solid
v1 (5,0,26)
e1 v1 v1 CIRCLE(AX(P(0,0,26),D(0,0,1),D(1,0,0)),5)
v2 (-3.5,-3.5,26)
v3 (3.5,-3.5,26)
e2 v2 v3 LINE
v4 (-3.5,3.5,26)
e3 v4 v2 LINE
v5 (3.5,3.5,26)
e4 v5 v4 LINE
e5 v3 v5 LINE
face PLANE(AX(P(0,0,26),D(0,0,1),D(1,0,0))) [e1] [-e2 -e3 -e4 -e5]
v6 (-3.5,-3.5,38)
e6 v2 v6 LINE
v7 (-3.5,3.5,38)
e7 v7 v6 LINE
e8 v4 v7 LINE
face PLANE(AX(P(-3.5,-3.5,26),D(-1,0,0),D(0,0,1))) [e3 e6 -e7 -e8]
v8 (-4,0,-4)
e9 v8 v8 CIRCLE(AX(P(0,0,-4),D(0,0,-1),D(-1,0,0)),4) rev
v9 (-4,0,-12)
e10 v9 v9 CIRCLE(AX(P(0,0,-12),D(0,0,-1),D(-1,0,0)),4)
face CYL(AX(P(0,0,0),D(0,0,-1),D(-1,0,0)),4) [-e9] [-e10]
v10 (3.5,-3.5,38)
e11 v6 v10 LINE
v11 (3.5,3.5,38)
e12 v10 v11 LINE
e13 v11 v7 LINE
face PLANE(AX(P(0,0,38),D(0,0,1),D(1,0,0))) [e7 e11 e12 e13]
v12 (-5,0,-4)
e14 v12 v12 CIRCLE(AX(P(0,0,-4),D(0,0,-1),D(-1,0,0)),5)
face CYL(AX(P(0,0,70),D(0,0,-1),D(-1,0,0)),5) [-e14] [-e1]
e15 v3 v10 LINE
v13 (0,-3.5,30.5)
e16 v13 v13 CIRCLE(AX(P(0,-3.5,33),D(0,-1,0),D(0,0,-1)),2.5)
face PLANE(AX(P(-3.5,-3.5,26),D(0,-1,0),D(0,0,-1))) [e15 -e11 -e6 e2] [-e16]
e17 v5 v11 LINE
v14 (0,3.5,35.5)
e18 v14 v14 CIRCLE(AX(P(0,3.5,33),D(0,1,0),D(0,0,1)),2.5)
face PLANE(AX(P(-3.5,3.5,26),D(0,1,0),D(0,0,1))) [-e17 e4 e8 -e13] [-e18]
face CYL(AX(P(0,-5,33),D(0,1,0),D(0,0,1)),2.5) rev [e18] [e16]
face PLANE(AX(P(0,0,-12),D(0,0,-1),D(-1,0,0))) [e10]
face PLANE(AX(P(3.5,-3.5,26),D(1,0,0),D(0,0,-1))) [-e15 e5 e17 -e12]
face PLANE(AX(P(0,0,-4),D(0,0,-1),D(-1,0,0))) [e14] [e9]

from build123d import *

# Parameters (mm, degrees)
ESQUISSE1_R                 = 5
BOSS_EXTRU_1_DEPTH          = 70
ESQUISSE2_R                 = 30
BOSS_EXTRU_2_DEPTH          = 5
ESQUISSE3_R                 = 3.5
BOSS_EXTRU_3_DEPTH          = 12
BOSS_EXTRU_4_START          = 12
ESQUISSE4_R                 = 3.5
BOSS_EXTRU_4_DEPTH          = 12
ENL_V_MAT_EXTRU_1_DEPTH     = 10
ESQUISSE6_R                 = 30
ENL_V_MAT_EXTRU_2_DEPTH     = 47
ESQUISSE7_R                 = 5
BOSS_EXTRU_5_DEPTH          = 3
ESQUISSE8_R                 = 4
BOSS_EXTRU_6_DEPTH          = 12
ENL_V_START                 = -12
ENL_V_MAT_EXTRU_3_OUTLINE_R = 5
ENL_V_MAT_EXTRU_3_OUTLINE_W = 7
ENL_V_MAT_EXTRU_3_OUTLINE_H = 7
ENL_V_MAT_EXTRU_3_DEPTH     = 12
ESQUISSE10_R                = 2.5
ENL_V_MAT_EXTRU_4_DEPTH     = 40.258756985
BOSS_EXTRU_7_START          = 4
ESQUISSE11_R                = 5
ESQUISSE11_R_2              = 4
BOSS_EXTRU_7_DEPTH          = 4


# Read off the part's stored shape, not the designer's step: Enlèv. mat.-Extru.3
with BuildPart() as part:
    # Esquisse1 → Boss.-Extru.1 (new body)
    with BuildSketch(Plane.XY):
        Circle(ESQUISSE1_R)
    extrude(amount=BOSS_EXTRU_1_DEPTH)

    # Esquisse2 → Boss.-Extru.2 (add)
    with BuildSketch(Plane.XY.offset(70)):
        Circle(ESQUISSE2_R)
    extrude(amount=-BOSS_EXTRU_2_DEPTH)

    # Esquisse3 → Boss.-Extru.3 (add)
    with BuildSketch(Plane(origin=(0, 0, 0), x_dir=(-1, 0, 0), z_dir=(0, 0, -1))):
        Circle(ESQUISSE3_R)
    extrude(amount=BOSS_EXTRU_3_DEPTH)

    # Esquisse4 → Boss.-Extru.4 (add)
    with BuildSketch(Plane.XY.offset(70).offset(BOSS_EXTRU_4_START)):
        with Locations(Location((0, 0, 0), (0, 0, 180))):
            Circle(ESQUISSE4_R)
    extrude(amount=-BOSS_EXTRU_4_DEPTH)

    # Esquisse5 → Enlèv. mat.-Extru.1 (cut)
    with BuildSketch(Plane.XY.offset(70)):
        with BuildLine():
            ThreePointArc((3.911624902, 29.743893333), (1.96, 29.935904864), (0, 30))
            Line((0, 30), (1.54, 24.952522919))
            ThreePointArc((1.54, 24.952522919), (1.639797772, 24.946163298), (1.739569306, 24.939404536))
            Line((1.739569306, 24.939404536), (3.911624902, 29.743893333))
        make_face()
        with BuildLine():
            Line((-1.54, 24.952522919), (0, 30))
            ThreePointArc((0, 30), (-1.96, 29.935904864), (-3.911624902, 29.743893333))
            Line((-3.911624902, 29.743893333), (-1.739569306, 24.939404536))
            ThreePointArc((-1.739569306, 24.939404536), (-1.639797772, 24.946163298), (-1.54, 24.952522919))
        make_face()
        with BuildLine():
            ThreePointArc((7.75646359, 28.979946042), (5.846535396, 29.424785876), (3.911624902, 29.743893333))
            Line((3.911624902, 29.743893333), (4.793067146, 24.536228466))
            ThreePointArc((4.793067146, 24.536228466), (4.878466786, 24.519391547), (4.963807286, 24.50225739))
            Line((4.963807286, 24.50225739), (7.75646359, 28.979946042))
        make_face()
        with BuildLine():
            Line((-4.793067146, 24.536228466), (-3.911624902, 29.743893333))
            ThreePointArc((-3.911624902, 29.743893333), (-5.846535396, 29.424785876), (-7.75646359, 28.979946042))
            Line((-7.75646359, 28.979946042), (-4.963807286, 24.50225739))
            ThreePointArc((-4.963807286, 24.50225739), (-4.878466786, 24.519391547), (-4.793067146, 24.536228466))
        make_face()
        with BuildLine():
            ThreePointArc((11.468870142, 27.721201591), (9.633248345, 28.411274634), (7.75646359, 28.979946042))
            Line((7.75646359, 28.979946042), (7.939081747, 23.705927128))
            ThreePointArc((7.939081747, 23.705927128), (8.021571427, 23.678141647), (8.103963866, 23.650069126))
            Line((8.103963866, 23.650069126), (11.468870142, 27.721201591))
        make_face()
        with BuildLine():
            Line((-7.939081747, 23.705927128), (-7.75646359, 28.979946042))
            ThreePointArc((-7.75646359, 28.979946042), (-9.633248345, 28.411274634), (-11.468870142, 27.721201591))
            Line((-11.468870142, 27.721201591), (-8.103963866, 23.650069126))
            ThreePointArc((-8.103963866, 23.650069126), (-8.021571427, 23.678141647), (-7.939081747, 23.705927128))
        make_face()
        with BuildLine():
            ThreePointArc((14.985459754, 25.989151505), (13.255485353, 26.912675602), (11.468870142, 27.721201591))
            Line((11.468870142, 27.721201591), (10.950617091, 22.474073626))
            ThreePointArc((10.950617091, 22.474073626), (11.04042578, 22.430091364), (11.130057821, 22.38575022))
            Line((11.130057821, 22.38575022), (14.985459754, 25.989151505))
        make_face()
        with BuildLine():
            Line((-10.950617091, 22.474073626), (-11.468870142, 27.721201591))
            ThreePointArc((-11.468870142, 27.721201591), (-13.255485353, 26.912675602), (-14.985459754, 25.989151505))
            Line((-14.985459754, 25.989151505), (-11.130057821, 22.38575022))
            ThreePointArc((-11.130057821, 22.38575022), (-11.04042578, 22.430091364), (-10.950617091, 22.474073626))
        make_face()
        with BuildLine():
            ThreePointArc((18.246190956, 23.813368422), (16.65140115, 24.954575527), (14.985459754, 25.989151505))
            Line((14.985459754, 25.989151505), (13.798277376, 20.847243018))
            ThreePointArc((13.798277376, 20.847243018), (13.870778356, 20.799074686), (13.943111187, 20.750654217))
            Line((13.943111187, 20.750654217), (18.246190956, 23.813368422))
        make_face()
        with BuildLine():
            Line((-13.798277376, 20.847243018), (-14.985459754, 25.989151505))
            ThreePointArc((-14.985459754, 25.989151505), (-16.65140115, 24.954575527), (-18.246190956, 23.813368422))
            Line((-18.246190956, 23.813368422), (-13.943111187, 20.750654217))
            ThreePointArc((-13.943111187, 20.750654217), (-13.870778356, 20.799074686), (-13.798277376, 20.847243018))
        make_face()
        with BuildLine():
            ThreePointArc((21.195390749, 21.231001177), (19.763014623, 22.570406576), (18.246190956, 23.813368422))
            Line((18.246190956, 23.813368422), (16.388920873, 18.878645942))
            ThreePointArc((16.388920873, 18.878645942), (16.464304345, 18.812939229), (16.539424387, 18.746931507))
            Line((16.539424387, 18.746931507), (21.195390749, 21.231001177))
        make_face()
        with BuildLine():
            Line((-16.388920873, 18.878645942), (-18.246190956, 23.813368422))
            ThreePointArc((-18.246190956, 23.813368422), (-19.763014623, 22.570406576), (-21.195390749, 21.231001177))
            Line((-21.195390749, 21.231001177), (-16.539424387, 18.746931507))
            ThreePointArc((-16.539424387, 18.746931507), (-16.464304345, 18.812939229), (-16.388920873, 18.878645942))
        make_face()
        with BuildLine():
            ThreePointArc((23.78270515, 18.286140537), (22.537198777, 19.800875518), (21.195390749, 21.231001177))
            Line((21.195390749, 21.231001177), (18.719140508, 16.57087139))
            ThreePointArc((18.719140508, 16.57087139), (18.78527424, 16.495862261), (18.851107406, 16.420589196))
            Line((18.851107406, 16.420589196), (23.78270515, 18.286140537))
        make_face()
        with BuildLine():
            Line((-18.719140508, 16.57087139), (-21.195390749, 21.231001177))
            ThreePointArc((-21.195390749, 21.231001177), (-22.537198777, 19.800875518), (-23.78270515, 18.286140537))
            Line((-23.78270515, 18.286140537), (-18.851107406, 16.420589196))
            ThreePointArc((-18.851107406, 16.420589196), (-18.78527424, 16.495862261), (-18.719140508, 16.57087139))
        make_face()
        with BuildLine():
            ThreePointArc((25.963958928, 15.029066397), (24.926587807, 16.693268712), (23.78270515, 18.286140537))
            Line((23.78270515, 18.286140537), (20.727218802, 13.97792548))
            ThreePointArc((20.727218802, 13.97792548), (20.775760628, 13.905674034), (20.824050599, 13.833254016))
            Line((20.824050599, 13.833254016), (25.963958928, 15.029066397))
        make_face()
        with BuildLine():
            Line((-20.727218802, 13.97792548), (-23.78270515, 18.286140537))
            ThreePointArc((-23.78270515, 18.286140537), (-24.926587807, 16.693268712), (-25.963958928, 15.029066397))
            Line((-25.963958928, 15.029066397), (-20.824050599, 13.833254016))
            ThreePointArc((-20.824050599, 13.833254016), (-20.775760628, 13.905674034), (-20.727218802, 13.97792548))
        make_face()
        with BuildLine():
            ThreePointArc((27.701909842, 11.515389317), (26.890385817, 13.300644745), (25.963958928, 15.029066397))
            Line((25.963958928, 15.029066397), (22.367034749, 11.167620899))
            ThreePointArc((22.367034749, 11.167620899), (22.405781894, 11.089677079), (22.444257425, 11.011598824))
            Line((22.444257425, 11.011598824), (27.701909842, 11.515389317))
        make_face()
        with BuildLine():
            Line((-22.367034749, 11.167620899), (-25.963958928, 15.029066397))
            ThreePointArc((-25.963958928, 15.029066397), (-26.890385817, 13.300644745), (-27.701909842, 11.515389317))
            Line((-27.701909842, 11.515389317), (-22.444257425, 11.011598824))
            ThreePointArc((-22.444257425, 11.011598824), (-22.405781894, 11.089677079), (-22.367034749, 11.167620899))
        make_face()
        with BuildLine():
            ThreePointArc((28.966884502, 7.805101039), (28.395063354, 9.680928526), (27.701909842, 11.515389317))
            Line((27.701909842, 11.515389317), (23.627977885, 8.168149181))
            ThreePointArc((23.627977885, 8.168149181), (23.660461458, 8.073571924), (23.692566461, 7.97886549))
            Line((23.692566461, 7.97886549), (28.966884502, 7.805101039))
        make_face()
        with BuildLine():
            Line((-23.627977885, 8.168149181), (-27.701909842, 11.515389317))
            ThreePointArc((-27.701909842, 11.515389317), (-28.395063354, 9.680928526), (-28.966884502, 7.805101039))
            Line((-28.966884502, 7.805101039), (-23.692566461, 7.97886549))
            ThreePointArc((-23.692566461, 7.97886549), (-23.660461458, 8.073571924), (-23.627977885, 8.168149181))
        make_face()
        with BuildLine():
            ThreePointArc((29.737285014, 3.9615502), (29.41492989, 5.895922284), (28.966884502, 7.805101039))
            Line((28.966884502, 7.805101039), (24.493890167, 5.004932014))
            ThreePointArc((24.493890167, 5.004932014), (24.513713944, 4.906916414), (24.533145499, 4.808822302))
            Line((24.533145499, 4.808822302), (29.737285014, 3.9615502))
        make_face()
        with BuildLine():
            Line((-24.493890167, 5.004932014), (-28.966884502, 7.805101039))
            ThreePointArc((-28.966884502, 7.805101039), (-29.41492989, 5.895922284), (-29.737285014, 3.9615502))
            Line((-29.737285014, 3.9615502), (-24.533145499, 4.808822302))
            ThreePointArc((-24.533145499, 4.808822302), (-24.513713944, 4.906916414), (-24.493890167, 5.004932014))
        make_face()
        with BuildLine():
            ThreePointArc((29.99995773, 0.050360733), (29.932572449, 2.010250376), (29.737285014, 3.9615502))
            Line((29.737285014, 3.9615502), (24.938282315, 1.755583995))
            ThreePointArc((24.938282315, 1.755583995), (24.944243639, 1.668744817), (24.949902576, 1.581885408))
            Line((24.949902576, 1.581885408), (29.99995773, 0.050360733))
        make_face()
        with BuildLine():
            Line((-24.938282315, 1.755583995), (-29.737285014, 3.9615502))
            ThreePointArc((-29.737285014, 3.9615502), (-29.932572449, 2.010250376), (-29.99995773, 0.050360733))
            Line((-29.99995773, 0.050360733), (-24.949902576, 1.581885408))
            ThreePointArc((-24.949902576, 1.581885408), (-24.944243639, 1.668744817), (-24.938282315, 1.755583995))
        make_face()
        with BuildLine():
            Line((-24.949902576, -1.581885408), (-29.99995773, -0.050360733))
            ThreePointArc((-29.99995773, -0.050360733), (-29.932572449, -2.010250376), (-29.737285014, -3.9615502))
            Line((-29.737285014, -3.9615502), (-24.938282315, -1.755583995))
            ThreePointArc((-24.938282315, -1.755583995), (-24.944243639, -1.668744817), (-24.949902576, -1.581885408))
        make_face()
        with BuildLine():
            ThreePointArc((29.737285014, -3.9615502), (29.932572449, -2.010250376), (29.99995773, -0.050360733))
            Line((29.99995773, -0.050360733), (24.949902576, -1.581885408))
            ThreePointArc((24.949902576, -1.581885408), (24.944243639, -1.668744817), (24.938282315, -1.755583995))
            Line((24.938282315, -1.755583995), (29.737285014, -3.9615502))
        make_face()
        with BuildLine():
            Line((-24.533145499, -4.808822302), (-29.737285014, -3.9615502))
            ThreePointArc((-29.737285014, -3.9615502), (-29.41492989, -5.895922284), (-28.966884502, -7.805101039))
            Line((-28.966884502, -7.805101039), (-24.493890167, -5.004932014))
            ThreePointArc((-24.493890167, -5.004932014), (-24.513713944, -4.906916414), (-24.533145499, -4.808822302))
        make_face()
        with BuildLine():
            ThreePointArc((28.966884502, -7.805101039), (29.41492989, -5.895922284), (29.737285014, -3.9615502))
            Line((29.737285014, -3.9615502), (24.533145499, -4.808822302))
            ThreePointArc((24.533145499, -4.808822302), (24.513713944, -4.906916414), (24.493890167, -5.004932014))
            Line((24.493890167, -5.004932014), (28.966884502, -7.805101039))
        make_face()
        with BuildLine():
            Line((-23.692566461, -7.97886549), (-28.966884502, -7.805101039))
            ThreePointArc((-28.966884502, -7.805101039), (-28.395063354, -9.680928526), (-27.701909842, -11.515389317))
            Line((-27.701909842, -11.515389317), (-23.627977885, -8.168149181))
            ThreePointArc((-23.627977885, -8.168149181), (-23.660461458, -8.073571924), (-23.692566461, -7.97886549))
        make_face()
        with BuildLine():
            ThreePointArc((27.701909842, -11.515389317), (28.395063354, -9.680928526), (28.966884502, -7.805101039))
            Line((28.966884502, -7.805101039), (23.692566461, -7.97886549))
            ThreePointArc((23.692566461, -7.97886549), (23.660461458, -8.073571924), (23.627977885, -8.168149181))
            Line((23.627977885, -8.168149181), (27.701909842, -11.515389317))
        make_face()
        with BuildLine():
            Line((-22.444257425, -11.011598824), (-27.701909842, -11.515389317))
            ThreePointArc((-27.701909842, -11.515389317), (-26.890385817, -13.300644745), (-25.963958928, -15.029066397))
            Line((-25.963958928, -15.029066397), (-22.367034749, -11.167620899))
            ThreePointArc((-22.367034749, -11.167620899), (-22.405781894, -11.089677079), (-22.444257425, -11.011598824))
        make_face()
        with BuildLine():
            ThreePointArc((25.963958928, -15.029066397), (26.890385817, -13.300644745), (27.701909842, -11.515389317))
            Line((27.701909842, -11.515389317), (22.444257425, -11.011598824))
            ThreePointArc((22.444257425, -11.011598824), (22.405781894, -11.089677079), (22.367034749, -11.167620899))
            Line((22.367034749, -11.167620899), (25.963958928, -15.029066397))
        make_face()
        with BuildLine():
            Line((-20.824050599, -13.833254016), (-25.963958928, -15.029066397))
            ThreePointArc((-25.963958928, -15.029066397), (-24.926587807, -16.693268712), (-23.78270515, -18.286140537))
            Line((-23.78270515, -18.286140537), (-20.727218802, -13.97792548))
            ThreePointArc((-20.727218802, -13.97792548), (-20.775760628, -13.905674034), (-20.824050599, -13.833254016))
        make_face()
        with BuildLine():
            ThreePointArc((23.78270515, -18.286140537), (24.926587807, -16.693268712), (25.963958928, -15.029066397))
            Line((25.963958928, -15.029066397), (20.824050599, -13.833254016))
            ThreePointArc((20.824050599, -13.833254016), (20.775760628, -13.905674034), (20.727218802, -13.97792548))
            Line((20.727218802, -13.97792548), (23.78270515, -18.286140537))
        make_face()
        with BuildLine():
            Line((-18.851107406, -16.420589196), (-23.78270515, -18.286140537))
            ThreePointArc((-23.78270515, -18.286140537), (-22.537198777, -19.800875518), (-21.195390749, -21.231001177))
            Line((-21.195390749, -21.231001177), (-18.719140508, -16.57087139))
            ThreePointArc((-18.719140508, -16.57087139), (-18.78527424, -16.495862261), (-18.851107406, -16.420589196))
        make_face()
        with BuildLine():
            ThreePointArc((21.195390749, -21.231001177), (22.537198777, -19.800875518), (23.78270515, -18.286140537))
            Line((23.78270515, -18.286140537), (18.851107406, -16.420589196))
            ThreePointArc((18.851107406, -16.420589196), (18.78527424, -16.495862261), (18.719140508, -16.57087139))
            Line((18.719140508, -16.57087139), (21.195390749, -21.231001177))
        make_face()
        with BuildLine():
            Line((-16.539424387, -18.746931507), (-21.195390749, -21.231001177))
            ThreePointArc((-21.195390749, -21.231001177), (-19.763014623, -22.570406576), (-18.246190956, -23.813368422))
            Line((-18.246190956, -23.813368422), (-16.388920873, -18.878645942))
            ThreePointArc((-16.388920873, -18.878645942), (-16.464304345, -18.812939229), (-16.539424387, -18.746931507))
        make_face()
        with BuildLine():
            ThreePointArc((18.246190956, -23.813368422), (19.763014623, -22.570406576), (21.195390749, -21.231001177))
            Line((21.195390749, -21.231001177), (16.539424387, -18.746931507))
            ThreePointArc((16.539424387, -18.746931507), (16.464304345, -18.812939229), (16.388920873, -18.878645942))
            Line((16.388920873, -18.878645942), (18.246190956, -23.813368422))
        make_face()
        with BuildLine():
            Line((-13.943111187, -20.750654217), (-18.246190956, -23.813368422))
            ThreePointArc((-18.246190956, -23.813368422), (-16.65140115, -24.954575527), (-14.985459754, -25.989151505))
            Line((-14.985459754, -25.989151505), (-13.798277376, -20.847243018))
            ThreePointArc((-13.798277376, -20.847243018), (-13.870778356, -20.799074686), (-13.943111187, -20.750654217))
        make_face()
        with BuildLine():
            ThreePointArc((14.985459754, -25.989151505), (16.65140115, -24.954575527), (18.246190956, -23.813368422))
            Line((18.246190956, -23.813368422), (13.943111187, -20.750654217))
            ThreePointArc((13.943111187, -20.750654217), (13.870778356, -20.799074686), (13.798277376, -20.847243018))
            Line((13.798277376, -20.847243018), (14.985459754, -25.989151505))
        make_face()
        with BuildLine():
            Line((-11.130057821, -22.38575022), (-14.985459754, -25.989151505))
            ThreePointArc((-14.985459754, -25.989151505), (-13.255485353, -26.912675602), (-11.468870142, -27.721201591))
            Line((-11.468870142, -27.721201591), (-10.950617091, -22.474073626))
            ThreePointArc((-10.950617091, -22.474073626), (-11.04042578, -22.430091364), (-11.130057821, -22.38575022))
        make_face()
        with BuildLine():
            ThreePointArc((11.468870142, -27.721201591), (13.255485353, -26.912675602), (14.985459754, -25.989151505))
            Line((14.985459754, -25.989151505), (11.130057821, -22.38575022))
            ThreePointArc((11.130057821, -22.38575022), (11.04042578, -22.430091364), (10.950617091, -22.474073626))
            Line((10.950617091, -22.474073626), (11.468870142, -27.721201591))
        make_face()
        with BuildLine():
            Line((-8.103963866, -23.650069126), (-11.468870142, -27.721201591))
            ThreePointArc((-11.468870142, -27.721201591), (-9.633248345, -28.411274634), (-7.75646359, -28.979946042))
            Line((-7.75646359, -28.979946042), (-7.939081747, -23.705927128))
            ThreePointArc((-7.939081747, -23.705927128), (-8.021571427, -23.678141647), (-8.103963866, -23.650069126))
        make_face()
        with BuildLine():
            ThreePointArc((7.75646359, -28.979946042), (9.633248345, -28.411274634), (11.468870142, -27.721201591))
            Line((11.468870142, -27.721201591), (8.103963866, -23.650069126))
            ThreePointArc((8.103963866, -23.650069126), (8.021571427, -23.678141647), (7.939081747, -23.705927128))
            Line((7.939081747, -23.705927128), (7.75646359, -28.979946042))
        make_face()
        with BuildLine():
            Line((-4.963807286, -24.50225739), (-7.75646359, -28.979946042))
            ThreePointArc((-7.75646359, -28.979946042), (-5.846535396, -29.424785876), (-3.911624902, -29.743893333))
            Line((-3.911624902, -29.743893333), (-4.793067146, -24.536228466))
            ThreePointArc((-4.793067146, -24.536228466), (-4.878466786, -24.519391547), (-4.963807286, -24.50225739))
        make_face()
        with BuildLine():
            ThreePointArc((3.911624902, -29.743893333), (5.846535396, -29.424785876), (7.75646359, -28.979946042))
            Line((7.75646359, -28.979946042), (4.963807286, -24.50225739))
            ThreePointArc((4.963807286, -24.50225739), (4.878466786, -24.519391547), (4.793067146, -24.536228466))
            Line((4.793067146, -24.536228466), (3.911624902, -29.743893333))
        make_face()
        with BuildLine():
            Line((-1.739569306, -24.939404536), (-3.911624902, -29.743893333))
            ThreePointArc((-3.911624902, -29.743893333), (-1.96, -29.935904864), (0, -30))
            Line((0, -30), (-1.54, -24.952522919))
            ThreePointArc((-1.54, -24.952522919), (-1.639797772, -24.946163298), (-1.739569306, -24.939404536))
        make_face()
        with BuildLine():
            ThreePointArc((0, -30), (1.96, -29.935904864), (3.911624902, -29.743893333))
            Line((3.911624902, -29.743893333), (1.739569306, -24.939404536))
            ThreePointArc((1.739569306, -24.939404536), (1.639797772, -24.946163298), (1.54, -24.952522919))
            Line((1.54, -24.952522919), (0, -30))
        make_face()
    extrude(amount=-ENL_V_MAT_EXTRU_1_DEPTH, mode=Mode.SUBTRACT)

    # Esquisse6 → Enlèv. mat.-Extru.2 (cut)
    with BuildSketch(Plane.XY.offset(82)):
        Circle(ESQUISSE6_R)
    extrude(amount=-ENL_V_MAT_EXTRU_2_DEPTH, mode=Mode.SUBTRACT)

    # Esquisse7 → Boss.-Extru.5 (add)
    with BuildSketch(Plane.XY.offset(35)):
        Circle(ESQUISSE7_R)
    extrude(amount=BOSS_EXTRU_5_DEPTH)

    # Esquisse8 → Boss.-Extru.6 (add)
    with BuildSketch(Plane(origin=(0, 0, -12), x_dir=(-1, 0, 0), z_dir=(0, 0, -1))):
        Circle(ESQUISSE8_R)
    extrude(amount=-BOSS_EXTRU_6_DEPTH)

    # Enlèv. mat.-Extru.3 outline → Enlèv. mat.-Extru.3 (cut)
    with BuildSketch(Plane.XY.offset(38).offset(ENL_V_START)):
        Circle(ENL_V_MAT_EXTRU_3_OUTLINE_R)
        Rectangle(ENL_V_MAT_EXTRU_3_OUTLINE_W, ENL_V_MAT_EXTRU_3_OUTLINE_H, mode=Mode.SUBTRACT)
    extrude(amount=ENL_V_MAT_EXTRU_3_DEPTH, mode=Mode.SUBTRACT)

    # Esquisse10 → Enlèv. mat.-Extru.4 (cut, through all)
    with BuildSketch(Plane(origin=(0, 3.5, 0), x_dir=(1, 0, 0), z_dir=(0, 1, 0))):
        with Locations(Location((0, -33, 0), (0, 0, 270))):
            Circle(ESQUISSE10_R)
    extrude(amount=-ENL_V_MAT_EXTRU_4_DEPTH, mode=Mode.SUBTRACT)

    # Esquisse11 → Boss.-Extru.7 (add)
    with BuildSketch(Plane(origin=(0, 0, 0), x_dir=(-1, 0, 0), z_dir=(0, 0, -1)).offset(BOSS_EXTRU_7_START)):
        Circle(ESQUISSE11_R)
        Circle(ESQUISSE11_R_2, mode=Mode.SUBTRACT)
    extrude(amount=-BOSS_EXTRU_7_DEPTH)


solid = part.part
